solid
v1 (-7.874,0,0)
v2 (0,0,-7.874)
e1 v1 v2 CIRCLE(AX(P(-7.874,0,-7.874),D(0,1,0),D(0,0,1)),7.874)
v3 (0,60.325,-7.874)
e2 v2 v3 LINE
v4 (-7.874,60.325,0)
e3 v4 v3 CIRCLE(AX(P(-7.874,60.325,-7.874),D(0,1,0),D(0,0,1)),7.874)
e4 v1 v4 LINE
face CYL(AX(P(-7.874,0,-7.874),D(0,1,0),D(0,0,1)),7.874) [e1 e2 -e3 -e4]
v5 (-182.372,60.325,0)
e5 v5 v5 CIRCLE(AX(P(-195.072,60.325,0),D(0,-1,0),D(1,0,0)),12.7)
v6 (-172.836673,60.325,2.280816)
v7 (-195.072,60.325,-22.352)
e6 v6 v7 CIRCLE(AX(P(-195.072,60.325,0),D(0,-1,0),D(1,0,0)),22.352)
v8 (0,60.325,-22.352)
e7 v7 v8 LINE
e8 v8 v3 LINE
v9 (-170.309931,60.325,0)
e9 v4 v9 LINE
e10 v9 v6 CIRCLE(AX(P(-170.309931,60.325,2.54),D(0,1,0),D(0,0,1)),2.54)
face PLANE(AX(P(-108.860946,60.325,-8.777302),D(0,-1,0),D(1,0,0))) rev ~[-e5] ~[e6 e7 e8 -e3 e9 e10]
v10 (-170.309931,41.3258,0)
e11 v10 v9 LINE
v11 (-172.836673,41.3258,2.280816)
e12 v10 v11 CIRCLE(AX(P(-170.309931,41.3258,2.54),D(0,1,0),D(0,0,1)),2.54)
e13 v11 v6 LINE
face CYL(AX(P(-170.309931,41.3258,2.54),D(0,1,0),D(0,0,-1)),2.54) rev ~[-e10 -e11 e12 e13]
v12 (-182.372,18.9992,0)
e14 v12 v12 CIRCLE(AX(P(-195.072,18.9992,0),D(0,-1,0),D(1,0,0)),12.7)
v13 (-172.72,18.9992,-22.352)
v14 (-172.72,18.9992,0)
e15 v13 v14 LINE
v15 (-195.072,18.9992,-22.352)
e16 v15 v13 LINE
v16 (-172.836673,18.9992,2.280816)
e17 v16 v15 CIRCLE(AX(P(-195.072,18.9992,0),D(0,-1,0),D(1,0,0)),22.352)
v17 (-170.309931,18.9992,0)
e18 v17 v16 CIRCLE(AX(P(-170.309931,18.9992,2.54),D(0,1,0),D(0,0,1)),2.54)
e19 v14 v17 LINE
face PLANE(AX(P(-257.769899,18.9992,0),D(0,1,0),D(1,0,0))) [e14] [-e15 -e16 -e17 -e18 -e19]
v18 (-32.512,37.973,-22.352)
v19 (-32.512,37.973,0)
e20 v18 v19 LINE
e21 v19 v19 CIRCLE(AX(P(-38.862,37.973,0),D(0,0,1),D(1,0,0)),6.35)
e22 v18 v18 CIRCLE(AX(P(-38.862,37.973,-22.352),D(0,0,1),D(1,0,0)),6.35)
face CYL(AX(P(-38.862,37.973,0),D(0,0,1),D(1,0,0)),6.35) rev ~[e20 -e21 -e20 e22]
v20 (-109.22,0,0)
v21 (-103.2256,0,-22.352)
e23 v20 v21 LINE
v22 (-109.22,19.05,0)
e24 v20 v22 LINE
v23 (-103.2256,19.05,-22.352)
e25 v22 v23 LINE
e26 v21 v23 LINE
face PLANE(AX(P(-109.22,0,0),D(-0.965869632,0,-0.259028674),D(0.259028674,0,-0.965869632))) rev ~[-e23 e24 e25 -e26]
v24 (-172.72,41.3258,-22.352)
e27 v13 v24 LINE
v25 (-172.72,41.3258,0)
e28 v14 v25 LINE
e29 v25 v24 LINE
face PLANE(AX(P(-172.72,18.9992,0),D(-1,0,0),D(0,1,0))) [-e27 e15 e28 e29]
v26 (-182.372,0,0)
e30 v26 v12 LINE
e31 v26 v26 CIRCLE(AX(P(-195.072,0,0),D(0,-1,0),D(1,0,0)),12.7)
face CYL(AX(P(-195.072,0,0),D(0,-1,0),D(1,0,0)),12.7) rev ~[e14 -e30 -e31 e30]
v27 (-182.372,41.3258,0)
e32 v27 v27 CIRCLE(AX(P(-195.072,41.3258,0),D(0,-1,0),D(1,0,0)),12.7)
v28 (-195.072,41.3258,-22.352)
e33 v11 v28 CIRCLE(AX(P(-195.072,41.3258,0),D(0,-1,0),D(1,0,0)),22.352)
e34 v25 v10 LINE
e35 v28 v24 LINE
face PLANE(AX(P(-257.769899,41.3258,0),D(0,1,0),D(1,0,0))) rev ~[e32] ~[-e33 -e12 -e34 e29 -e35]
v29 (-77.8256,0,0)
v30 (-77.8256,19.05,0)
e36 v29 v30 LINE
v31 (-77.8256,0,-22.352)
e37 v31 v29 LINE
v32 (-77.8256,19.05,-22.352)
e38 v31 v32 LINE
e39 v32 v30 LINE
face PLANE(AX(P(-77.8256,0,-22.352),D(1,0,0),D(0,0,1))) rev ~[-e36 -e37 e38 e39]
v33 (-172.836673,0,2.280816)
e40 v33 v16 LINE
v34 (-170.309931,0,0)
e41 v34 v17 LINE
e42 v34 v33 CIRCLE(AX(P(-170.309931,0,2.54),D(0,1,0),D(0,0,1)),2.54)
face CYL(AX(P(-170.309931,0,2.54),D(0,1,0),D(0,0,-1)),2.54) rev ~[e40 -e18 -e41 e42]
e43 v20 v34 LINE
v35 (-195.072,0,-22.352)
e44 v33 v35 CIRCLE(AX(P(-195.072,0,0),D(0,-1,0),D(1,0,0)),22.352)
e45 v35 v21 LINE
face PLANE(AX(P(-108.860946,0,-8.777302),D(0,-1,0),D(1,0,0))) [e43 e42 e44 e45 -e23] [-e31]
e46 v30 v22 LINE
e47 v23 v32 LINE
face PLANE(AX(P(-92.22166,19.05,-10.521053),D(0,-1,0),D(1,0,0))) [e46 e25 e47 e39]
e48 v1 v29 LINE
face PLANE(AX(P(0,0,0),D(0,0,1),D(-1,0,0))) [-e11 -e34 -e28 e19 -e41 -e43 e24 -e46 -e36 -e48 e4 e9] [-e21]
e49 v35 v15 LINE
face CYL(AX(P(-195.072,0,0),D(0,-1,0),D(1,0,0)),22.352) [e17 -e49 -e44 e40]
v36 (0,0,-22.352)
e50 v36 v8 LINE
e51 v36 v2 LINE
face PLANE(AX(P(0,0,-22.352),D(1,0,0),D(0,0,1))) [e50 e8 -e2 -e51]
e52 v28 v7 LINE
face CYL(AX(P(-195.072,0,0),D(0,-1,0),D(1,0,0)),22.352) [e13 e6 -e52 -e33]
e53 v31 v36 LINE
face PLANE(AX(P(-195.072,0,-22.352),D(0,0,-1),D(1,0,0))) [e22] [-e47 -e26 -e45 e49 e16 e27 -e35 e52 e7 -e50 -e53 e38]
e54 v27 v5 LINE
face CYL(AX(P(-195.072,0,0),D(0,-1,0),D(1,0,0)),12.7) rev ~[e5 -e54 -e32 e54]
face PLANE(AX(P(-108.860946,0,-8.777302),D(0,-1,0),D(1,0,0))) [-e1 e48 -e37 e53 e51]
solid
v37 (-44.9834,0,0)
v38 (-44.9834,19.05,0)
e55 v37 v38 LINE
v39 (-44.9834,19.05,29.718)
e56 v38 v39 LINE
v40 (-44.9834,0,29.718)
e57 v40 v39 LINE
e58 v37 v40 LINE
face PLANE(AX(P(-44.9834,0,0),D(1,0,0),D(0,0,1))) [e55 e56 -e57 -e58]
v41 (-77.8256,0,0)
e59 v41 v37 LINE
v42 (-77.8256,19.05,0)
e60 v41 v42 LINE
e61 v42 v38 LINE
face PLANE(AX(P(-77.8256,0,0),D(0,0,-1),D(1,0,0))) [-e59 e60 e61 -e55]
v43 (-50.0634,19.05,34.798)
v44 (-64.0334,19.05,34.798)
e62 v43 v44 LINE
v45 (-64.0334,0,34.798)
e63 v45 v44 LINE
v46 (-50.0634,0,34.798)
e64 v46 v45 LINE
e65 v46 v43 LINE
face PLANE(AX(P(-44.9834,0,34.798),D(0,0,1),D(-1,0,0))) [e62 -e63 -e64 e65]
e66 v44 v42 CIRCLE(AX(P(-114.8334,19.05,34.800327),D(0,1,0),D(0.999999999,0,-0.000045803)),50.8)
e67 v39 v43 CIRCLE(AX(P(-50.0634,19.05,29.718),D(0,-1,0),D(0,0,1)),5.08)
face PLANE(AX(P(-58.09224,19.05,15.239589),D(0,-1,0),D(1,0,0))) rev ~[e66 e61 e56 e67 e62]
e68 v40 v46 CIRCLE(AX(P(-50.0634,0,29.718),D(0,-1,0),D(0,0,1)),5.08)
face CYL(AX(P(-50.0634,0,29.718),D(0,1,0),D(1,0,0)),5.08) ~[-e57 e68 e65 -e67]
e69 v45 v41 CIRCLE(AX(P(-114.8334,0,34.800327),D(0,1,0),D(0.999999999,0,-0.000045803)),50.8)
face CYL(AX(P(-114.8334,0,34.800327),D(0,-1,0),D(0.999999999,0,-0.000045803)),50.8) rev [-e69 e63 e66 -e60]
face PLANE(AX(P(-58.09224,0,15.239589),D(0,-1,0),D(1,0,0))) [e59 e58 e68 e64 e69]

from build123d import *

# Parameters (mm, degrees)
F0_R     = 12.7
F1_DEPTH = 60.325
F2_DEPTH = 19.05
F4_DEPTH = 19.05
F5_W     = 85.049899257
F5_H     = 22.3266
F5_R     = 6.35
F6_DEPTH = 29.464
F7_R     = 7.874
F8_R     = 5.08
F9_R     = 2.54


with BuildPart() as f1:
    # F0 (on Front) → F1 (new body)
    with BuildSketch(Plane.XZ):
        with BuildLine():
            Line((-77.8256, 0), (-172.72, 0))
            ThreePointArc((-172.72, 0), (-210.8772507731, 15.8052507731), (-195.072, -22.352))
            Line((-195.072, -22.352), (0, -22.352))
            Line((0, -22.352), (0, 0))
            Line((0, 0), (-44.9834, 0))
            Line((-44.9834, 0), (-77.8256, 0))
        make_face()
        with Locations((-195.072, 0)):
            Circle(F0_R, mode=Mode.SUBTRACT)
    extrude(amount=-F1_DEPTH)

    # F3 (on face) → F4 (cut)
    with BuildSketch(Plane.XZ):
        Polygon((-77.8256, -22.352), (-77.8256, 0), (-109.22, 0), (-103.2256, -22.352), align=None)
    extrude(amount=-F4_DEPTH, mode=Mode.SUBTRACT)

    # F5 (on face) → F6 (cut, symmetric)
    with BuildSketch(Plane.XY):
        with Locations((-215.2449496285, 30.1625)):
            Rectangle(F5_W, F5_H)
        with Locations((-38.862, 37.973)):
            Circle(F5_R)
    extrude(amount=F6_DEPTH, both=True, mode=Mode.SUBTRACT)

    # F7
    f7_edges = [f1.edges().sort_by_distance(p)[0] for p in [
        (0, 30.1625, 0),
    ]]
    fillet(f7_edges, radius=F7_R)

    # F9
    f9_edges = [f1.edges().sort_by_distance(p)[0] for p in [
        (-172.72, 50.8254, 0),
        (-172.72, 9.4996, 0),
    ]]
    fillet(f9_edges, radius=F9_R)


with BuildPart() as f2:
    # F0 (on Front) → F2 (new body)
    with BuildSketch(Plane.XZ):
        with BuildLine():
            ThreePointArc((-64.0334, 34.798), (-67.6075846384, 16.0823576341), (-77.8256, 0))
            Line((-77.8256, 0), (-44.9834, 0))
            Line((-44.9834, 0), (-44.9834, 34.798))
            Line((-44.9834, 34.798), (-64.0334, 34.798))
        make_face()
    extrude(amount=-F2_DEPTH)

    # F8
    f8_edges = [f2.edges().sort_by_distance(p)[0] for p in [
        (-44.9834, 9.525, 34.798),
    ]]
    fillet(f8_edges, radius=F8_R)


solid = Compound([f1.part, f2.part])
